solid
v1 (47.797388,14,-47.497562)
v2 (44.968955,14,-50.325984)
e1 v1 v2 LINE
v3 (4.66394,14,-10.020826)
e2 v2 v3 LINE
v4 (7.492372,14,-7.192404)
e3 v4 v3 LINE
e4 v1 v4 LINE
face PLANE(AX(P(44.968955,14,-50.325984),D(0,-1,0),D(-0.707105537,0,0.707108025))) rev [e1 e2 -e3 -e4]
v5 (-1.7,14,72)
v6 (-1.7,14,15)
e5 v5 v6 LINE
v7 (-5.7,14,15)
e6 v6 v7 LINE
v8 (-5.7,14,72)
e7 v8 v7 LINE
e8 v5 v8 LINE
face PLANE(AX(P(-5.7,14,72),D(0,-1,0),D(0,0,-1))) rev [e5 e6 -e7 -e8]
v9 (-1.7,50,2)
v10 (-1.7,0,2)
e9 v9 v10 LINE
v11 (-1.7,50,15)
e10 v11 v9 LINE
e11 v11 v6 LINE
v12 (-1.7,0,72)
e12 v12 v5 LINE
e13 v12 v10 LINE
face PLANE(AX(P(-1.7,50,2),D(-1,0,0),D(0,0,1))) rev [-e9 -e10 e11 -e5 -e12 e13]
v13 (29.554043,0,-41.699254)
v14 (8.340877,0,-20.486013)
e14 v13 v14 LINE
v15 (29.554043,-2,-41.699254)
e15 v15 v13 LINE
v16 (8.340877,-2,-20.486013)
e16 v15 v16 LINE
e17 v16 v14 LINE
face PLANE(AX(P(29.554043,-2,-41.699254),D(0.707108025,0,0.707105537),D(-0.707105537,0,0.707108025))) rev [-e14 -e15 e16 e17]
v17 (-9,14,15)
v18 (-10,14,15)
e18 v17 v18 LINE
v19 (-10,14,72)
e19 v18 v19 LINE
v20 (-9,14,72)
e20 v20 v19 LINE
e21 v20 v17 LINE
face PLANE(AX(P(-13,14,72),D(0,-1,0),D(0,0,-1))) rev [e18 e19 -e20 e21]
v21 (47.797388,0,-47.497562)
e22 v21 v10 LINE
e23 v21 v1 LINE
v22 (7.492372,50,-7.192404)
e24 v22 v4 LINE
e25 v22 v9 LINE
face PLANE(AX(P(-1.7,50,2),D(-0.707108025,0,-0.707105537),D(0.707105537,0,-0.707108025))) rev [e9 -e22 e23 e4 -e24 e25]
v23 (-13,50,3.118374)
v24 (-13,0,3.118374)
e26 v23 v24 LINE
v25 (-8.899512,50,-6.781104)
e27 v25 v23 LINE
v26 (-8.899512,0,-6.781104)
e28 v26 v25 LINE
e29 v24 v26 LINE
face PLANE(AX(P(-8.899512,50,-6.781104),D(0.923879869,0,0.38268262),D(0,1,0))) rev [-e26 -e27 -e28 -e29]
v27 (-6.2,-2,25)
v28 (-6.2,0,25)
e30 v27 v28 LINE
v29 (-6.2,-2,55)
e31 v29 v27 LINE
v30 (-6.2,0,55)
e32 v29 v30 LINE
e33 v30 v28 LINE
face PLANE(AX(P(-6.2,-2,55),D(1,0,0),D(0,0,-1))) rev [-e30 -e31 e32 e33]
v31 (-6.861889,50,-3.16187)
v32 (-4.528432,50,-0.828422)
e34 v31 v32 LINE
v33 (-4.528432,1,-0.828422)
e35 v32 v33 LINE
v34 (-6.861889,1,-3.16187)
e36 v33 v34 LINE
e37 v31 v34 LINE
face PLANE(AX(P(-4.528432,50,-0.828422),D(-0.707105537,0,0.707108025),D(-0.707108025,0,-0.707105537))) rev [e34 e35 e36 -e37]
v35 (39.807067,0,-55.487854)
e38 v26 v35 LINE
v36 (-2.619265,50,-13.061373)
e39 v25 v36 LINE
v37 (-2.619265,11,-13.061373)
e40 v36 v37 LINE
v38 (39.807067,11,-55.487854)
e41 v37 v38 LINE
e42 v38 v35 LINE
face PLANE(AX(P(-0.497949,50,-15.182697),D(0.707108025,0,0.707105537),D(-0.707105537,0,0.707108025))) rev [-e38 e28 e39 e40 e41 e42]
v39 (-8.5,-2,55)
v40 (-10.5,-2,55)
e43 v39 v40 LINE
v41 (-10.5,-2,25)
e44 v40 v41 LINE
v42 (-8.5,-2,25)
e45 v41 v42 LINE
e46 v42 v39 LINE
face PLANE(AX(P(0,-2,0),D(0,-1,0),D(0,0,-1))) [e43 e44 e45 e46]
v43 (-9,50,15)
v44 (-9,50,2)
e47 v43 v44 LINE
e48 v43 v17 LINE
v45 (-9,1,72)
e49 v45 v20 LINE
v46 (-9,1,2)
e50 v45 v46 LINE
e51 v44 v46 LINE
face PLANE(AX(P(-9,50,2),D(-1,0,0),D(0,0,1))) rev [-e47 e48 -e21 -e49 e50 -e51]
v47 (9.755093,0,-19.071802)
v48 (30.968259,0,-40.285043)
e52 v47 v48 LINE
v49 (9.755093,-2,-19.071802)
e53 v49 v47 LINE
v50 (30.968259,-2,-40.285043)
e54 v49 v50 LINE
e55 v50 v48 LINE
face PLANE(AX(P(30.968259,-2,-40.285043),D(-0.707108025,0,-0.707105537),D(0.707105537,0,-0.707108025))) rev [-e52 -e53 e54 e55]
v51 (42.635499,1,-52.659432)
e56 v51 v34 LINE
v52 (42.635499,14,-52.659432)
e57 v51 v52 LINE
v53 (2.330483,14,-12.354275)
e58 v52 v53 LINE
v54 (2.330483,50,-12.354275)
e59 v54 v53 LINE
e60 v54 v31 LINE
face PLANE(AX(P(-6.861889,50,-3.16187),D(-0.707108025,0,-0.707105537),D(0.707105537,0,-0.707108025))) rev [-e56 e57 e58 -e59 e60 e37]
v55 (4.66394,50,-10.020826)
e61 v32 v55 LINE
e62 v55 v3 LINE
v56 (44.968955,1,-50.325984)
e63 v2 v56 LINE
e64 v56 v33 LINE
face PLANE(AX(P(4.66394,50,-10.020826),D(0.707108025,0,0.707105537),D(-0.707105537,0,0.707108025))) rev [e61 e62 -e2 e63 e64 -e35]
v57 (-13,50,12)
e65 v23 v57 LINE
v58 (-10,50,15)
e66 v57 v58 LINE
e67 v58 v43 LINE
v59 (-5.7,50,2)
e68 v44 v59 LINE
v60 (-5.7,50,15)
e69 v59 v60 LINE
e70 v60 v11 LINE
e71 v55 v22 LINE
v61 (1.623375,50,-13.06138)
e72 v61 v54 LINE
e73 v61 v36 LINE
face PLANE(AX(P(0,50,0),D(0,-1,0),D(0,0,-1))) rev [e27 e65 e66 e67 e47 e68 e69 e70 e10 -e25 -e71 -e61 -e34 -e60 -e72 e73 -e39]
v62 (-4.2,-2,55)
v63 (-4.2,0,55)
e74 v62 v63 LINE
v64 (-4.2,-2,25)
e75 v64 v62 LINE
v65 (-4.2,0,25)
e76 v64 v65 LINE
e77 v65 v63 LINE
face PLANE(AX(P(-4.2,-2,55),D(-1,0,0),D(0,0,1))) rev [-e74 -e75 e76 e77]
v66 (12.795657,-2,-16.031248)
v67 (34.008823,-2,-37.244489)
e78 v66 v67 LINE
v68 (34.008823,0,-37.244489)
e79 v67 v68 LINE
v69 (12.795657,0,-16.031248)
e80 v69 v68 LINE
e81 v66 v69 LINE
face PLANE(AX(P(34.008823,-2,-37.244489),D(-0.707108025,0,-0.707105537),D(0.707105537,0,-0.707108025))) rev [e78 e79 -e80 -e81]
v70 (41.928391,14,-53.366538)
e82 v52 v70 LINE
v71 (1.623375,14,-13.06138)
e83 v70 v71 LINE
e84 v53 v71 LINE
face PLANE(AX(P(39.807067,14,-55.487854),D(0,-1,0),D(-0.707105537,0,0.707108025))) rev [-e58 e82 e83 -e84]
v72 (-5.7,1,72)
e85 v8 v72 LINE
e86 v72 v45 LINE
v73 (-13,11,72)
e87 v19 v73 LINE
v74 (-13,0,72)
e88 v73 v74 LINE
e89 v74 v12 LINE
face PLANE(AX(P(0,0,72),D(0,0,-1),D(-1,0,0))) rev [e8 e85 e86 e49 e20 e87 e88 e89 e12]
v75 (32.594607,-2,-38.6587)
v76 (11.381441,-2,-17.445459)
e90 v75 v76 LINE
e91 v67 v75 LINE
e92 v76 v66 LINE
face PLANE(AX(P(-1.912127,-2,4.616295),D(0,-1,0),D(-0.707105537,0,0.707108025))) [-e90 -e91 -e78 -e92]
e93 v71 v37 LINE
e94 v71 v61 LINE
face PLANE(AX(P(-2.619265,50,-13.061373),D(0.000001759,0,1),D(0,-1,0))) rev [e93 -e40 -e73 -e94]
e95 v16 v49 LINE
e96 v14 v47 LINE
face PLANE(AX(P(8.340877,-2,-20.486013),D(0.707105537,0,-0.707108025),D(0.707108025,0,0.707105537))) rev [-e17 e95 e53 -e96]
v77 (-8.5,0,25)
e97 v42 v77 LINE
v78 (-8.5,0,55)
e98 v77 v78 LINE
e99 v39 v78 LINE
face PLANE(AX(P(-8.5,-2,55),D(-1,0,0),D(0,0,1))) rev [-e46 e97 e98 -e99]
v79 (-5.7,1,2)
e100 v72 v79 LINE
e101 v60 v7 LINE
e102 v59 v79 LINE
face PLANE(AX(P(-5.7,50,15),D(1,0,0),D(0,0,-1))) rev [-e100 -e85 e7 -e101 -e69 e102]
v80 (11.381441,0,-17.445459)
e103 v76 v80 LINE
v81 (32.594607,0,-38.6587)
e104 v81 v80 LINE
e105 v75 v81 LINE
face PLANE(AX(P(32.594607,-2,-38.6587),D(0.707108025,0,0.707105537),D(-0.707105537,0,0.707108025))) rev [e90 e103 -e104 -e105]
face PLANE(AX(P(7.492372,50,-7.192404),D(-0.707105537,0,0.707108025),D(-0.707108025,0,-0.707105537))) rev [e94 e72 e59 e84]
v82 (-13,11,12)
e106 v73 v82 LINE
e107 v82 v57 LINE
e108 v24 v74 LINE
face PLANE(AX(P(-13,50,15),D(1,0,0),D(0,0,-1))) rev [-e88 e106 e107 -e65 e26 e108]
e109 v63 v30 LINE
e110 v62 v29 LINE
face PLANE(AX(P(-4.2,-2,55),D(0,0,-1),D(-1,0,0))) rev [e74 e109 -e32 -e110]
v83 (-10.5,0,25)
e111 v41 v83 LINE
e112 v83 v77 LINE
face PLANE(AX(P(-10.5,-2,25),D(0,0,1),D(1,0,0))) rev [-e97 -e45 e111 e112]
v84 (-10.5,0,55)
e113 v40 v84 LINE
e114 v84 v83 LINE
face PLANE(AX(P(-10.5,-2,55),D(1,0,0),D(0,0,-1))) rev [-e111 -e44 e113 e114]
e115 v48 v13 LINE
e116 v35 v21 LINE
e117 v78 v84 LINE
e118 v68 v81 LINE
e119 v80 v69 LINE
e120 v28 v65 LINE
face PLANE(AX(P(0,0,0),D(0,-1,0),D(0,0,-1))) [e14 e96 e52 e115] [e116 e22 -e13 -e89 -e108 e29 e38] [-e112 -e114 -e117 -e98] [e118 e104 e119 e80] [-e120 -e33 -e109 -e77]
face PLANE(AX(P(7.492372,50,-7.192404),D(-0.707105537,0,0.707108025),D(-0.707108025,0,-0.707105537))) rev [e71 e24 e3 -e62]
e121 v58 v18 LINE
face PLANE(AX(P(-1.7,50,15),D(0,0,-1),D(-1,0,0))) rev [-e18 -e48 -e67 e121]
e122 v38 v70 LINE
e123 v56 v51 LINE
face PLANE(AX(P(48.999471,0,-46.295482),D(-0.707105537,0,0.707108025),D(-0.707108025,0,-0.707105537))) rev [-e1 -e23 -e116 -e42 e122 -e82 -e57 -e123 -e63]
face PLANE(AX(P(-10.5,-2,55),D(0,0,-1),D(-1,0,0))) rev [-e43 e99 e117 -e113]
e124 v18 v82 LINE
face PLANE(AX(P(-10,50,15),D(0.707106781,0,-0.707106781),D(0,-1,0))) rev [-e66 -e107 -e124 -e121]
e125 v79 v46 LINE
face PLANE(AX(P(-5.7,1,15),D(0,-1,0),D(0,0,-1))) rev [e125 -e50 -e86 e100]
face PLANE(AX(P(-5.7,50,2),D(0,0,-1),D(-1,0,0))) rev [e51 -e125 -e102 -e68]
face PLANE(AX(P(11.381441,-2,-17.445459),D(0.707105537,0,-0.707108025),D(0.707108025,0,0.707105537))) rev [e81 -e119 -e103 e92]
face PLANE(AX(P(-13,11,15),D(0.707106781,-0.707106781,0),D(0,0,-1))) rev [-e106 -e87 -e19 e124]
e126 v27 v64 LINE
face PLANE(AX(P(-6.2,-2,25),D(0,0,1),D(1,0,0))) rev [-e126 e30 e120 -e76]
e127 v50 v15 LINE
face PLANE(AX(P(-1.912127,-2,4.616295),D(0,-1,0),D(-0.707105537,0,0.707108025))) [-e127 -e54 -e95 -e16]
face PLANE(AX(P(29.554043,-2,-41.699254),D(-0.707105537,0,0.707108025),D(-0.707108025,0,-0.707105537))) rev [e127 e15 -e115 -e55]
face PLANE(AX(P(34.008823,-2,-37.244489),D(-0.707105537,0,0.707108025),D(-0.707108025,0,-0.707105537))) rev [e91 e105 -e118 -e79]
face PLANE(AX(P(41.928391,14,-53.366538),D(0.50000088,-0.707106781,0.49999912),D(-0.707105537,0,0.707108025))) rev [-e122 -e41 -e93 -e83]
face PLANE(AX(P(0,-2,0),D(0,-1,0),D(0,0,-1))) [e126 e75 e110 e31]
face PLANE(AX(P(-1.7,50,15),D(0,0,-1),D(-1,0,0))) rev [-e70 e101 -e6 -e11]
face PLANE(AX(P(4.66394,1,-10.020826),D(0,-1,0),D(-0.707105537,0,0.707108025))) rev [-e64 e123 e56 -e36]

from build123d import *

# Parameters (mm, degrees)
BOSS_EXTRUDE1_DEPTH = 50
SKETCH3_W           = 3.3
SKETCH3_H           = 1
BOSS_EXTRUDE2_DEPTH = 13
BOSS_EXTRUDE3_DEPTH = 57
SKETCH6_W           = 2
SKETCH6_H           = 30
BOSS_EXTRUDE4_DEPTH = 2
CHAMFER1_START      = -14
CHAMFER1_OUTLINE_W  = 52
CHAMFER1_OUTLINE_H  = 13
CHAMFER1_DEPTH      = 3.182909169
CHAMFER2_SIZE       = 3


with BuildPart() as part:
    # Sketch2 → Boss-Extrude1 (new body)
    with BuildSketch(Plane(origin=(0, 0, 0), x_dir=(1, 0, 0), z_dir=(0, 1, 0))):
        Polygon((-1.7, -2), (-1.7, -15), (-5.7, -15), (-5.7, -2), (-9, -2), (-9, -15), (-13, -15), (-13, 2.680601608), align=None)
    extrude(amount=BOSS_EXTRUDE1_DEPTH)

    # Sketch3 → Boss-Extrude2 (add)
    with BuildSketch(Plane.XY.offset(2)):
        with Locations((-7.35, 0.5)):
            Rectangle(SKETCH3_W, SKETCH3_H)
    extrude(amount=BOSS_EXTRUDE2_DEPTH)

    # Sketch5 → Boss-Extrude3 (add)
    with BuildSketch(Plane.XY.offset(15)):
        Polygon((-13, 0), (-1.7, 0), (-1.7, 14), (-5.7, 14), (-5.7, 1), (-9, 1), (-9, 14), (-13, 14), align=None)
    extrude(amount=BOSS_EXTRUDE3_DEPTH)

    # Sketch6 → Boss-Extrude4 (add)
    with BuildSketch(Plane(origin=(0, 0, 0), x_dir=(-1, 0, 0), z_dir=(0, -1, 0))):
        with Locations((5.2, -40)):
            Rectangle(SKETCH6_W, SKETCH6_H)
        with Locations((9.5, -40)):
            Rectangle(SKETCH6_W, SKETCH6_H)
    extrude(amount=BOSS_EXTRUDE4_DEPTH)

    # Mirror1: part across plane


with BuildPart() as part_1:
    add(part.part)
    add(part.part.mirror(Plane(origin=(-0.956063716, 0, 2.308147732), x_dir=(0.9238798691632129, 0, 0.38268261961443256), z_dir=(0.3826826196144326, 0, -0.9238798691632131))))

    # Chamfer1: read off the stored shape, not the designer's step
    # Chamfer1 outline → Chamfer1 (cut)
    with BuildSketch(Plane(origin=(0, 0, 0), x_dir=(0, 1, 0), z_dir=(0.9238798691632129, 0, 0.38268261961443295)).offset(CHAMFER1_START)):
        with Locations((25, 2.5)):
            Rectangle(CHAMFER1_OUTLINE_W, CHAMFER1_OUTLINE_H)
    extrude(amount=CHAMFER1_DEPTH, mode=Mode.SUBTRACT)

    # Chamfer2
    chamfer2_edges = [part_1.edges().sort_by_distance(p)[0] for p in [
        (-13, 32, 15),
        (-13, 14, 43.5),
        (-0.497948704, 32, -15.182696898),
        (19.654559103, 14, -35.335275619),
    ]]
    chamfer(chamfer2_edges, length=CHAMFER2_SIZE)


solid = part_1.part
